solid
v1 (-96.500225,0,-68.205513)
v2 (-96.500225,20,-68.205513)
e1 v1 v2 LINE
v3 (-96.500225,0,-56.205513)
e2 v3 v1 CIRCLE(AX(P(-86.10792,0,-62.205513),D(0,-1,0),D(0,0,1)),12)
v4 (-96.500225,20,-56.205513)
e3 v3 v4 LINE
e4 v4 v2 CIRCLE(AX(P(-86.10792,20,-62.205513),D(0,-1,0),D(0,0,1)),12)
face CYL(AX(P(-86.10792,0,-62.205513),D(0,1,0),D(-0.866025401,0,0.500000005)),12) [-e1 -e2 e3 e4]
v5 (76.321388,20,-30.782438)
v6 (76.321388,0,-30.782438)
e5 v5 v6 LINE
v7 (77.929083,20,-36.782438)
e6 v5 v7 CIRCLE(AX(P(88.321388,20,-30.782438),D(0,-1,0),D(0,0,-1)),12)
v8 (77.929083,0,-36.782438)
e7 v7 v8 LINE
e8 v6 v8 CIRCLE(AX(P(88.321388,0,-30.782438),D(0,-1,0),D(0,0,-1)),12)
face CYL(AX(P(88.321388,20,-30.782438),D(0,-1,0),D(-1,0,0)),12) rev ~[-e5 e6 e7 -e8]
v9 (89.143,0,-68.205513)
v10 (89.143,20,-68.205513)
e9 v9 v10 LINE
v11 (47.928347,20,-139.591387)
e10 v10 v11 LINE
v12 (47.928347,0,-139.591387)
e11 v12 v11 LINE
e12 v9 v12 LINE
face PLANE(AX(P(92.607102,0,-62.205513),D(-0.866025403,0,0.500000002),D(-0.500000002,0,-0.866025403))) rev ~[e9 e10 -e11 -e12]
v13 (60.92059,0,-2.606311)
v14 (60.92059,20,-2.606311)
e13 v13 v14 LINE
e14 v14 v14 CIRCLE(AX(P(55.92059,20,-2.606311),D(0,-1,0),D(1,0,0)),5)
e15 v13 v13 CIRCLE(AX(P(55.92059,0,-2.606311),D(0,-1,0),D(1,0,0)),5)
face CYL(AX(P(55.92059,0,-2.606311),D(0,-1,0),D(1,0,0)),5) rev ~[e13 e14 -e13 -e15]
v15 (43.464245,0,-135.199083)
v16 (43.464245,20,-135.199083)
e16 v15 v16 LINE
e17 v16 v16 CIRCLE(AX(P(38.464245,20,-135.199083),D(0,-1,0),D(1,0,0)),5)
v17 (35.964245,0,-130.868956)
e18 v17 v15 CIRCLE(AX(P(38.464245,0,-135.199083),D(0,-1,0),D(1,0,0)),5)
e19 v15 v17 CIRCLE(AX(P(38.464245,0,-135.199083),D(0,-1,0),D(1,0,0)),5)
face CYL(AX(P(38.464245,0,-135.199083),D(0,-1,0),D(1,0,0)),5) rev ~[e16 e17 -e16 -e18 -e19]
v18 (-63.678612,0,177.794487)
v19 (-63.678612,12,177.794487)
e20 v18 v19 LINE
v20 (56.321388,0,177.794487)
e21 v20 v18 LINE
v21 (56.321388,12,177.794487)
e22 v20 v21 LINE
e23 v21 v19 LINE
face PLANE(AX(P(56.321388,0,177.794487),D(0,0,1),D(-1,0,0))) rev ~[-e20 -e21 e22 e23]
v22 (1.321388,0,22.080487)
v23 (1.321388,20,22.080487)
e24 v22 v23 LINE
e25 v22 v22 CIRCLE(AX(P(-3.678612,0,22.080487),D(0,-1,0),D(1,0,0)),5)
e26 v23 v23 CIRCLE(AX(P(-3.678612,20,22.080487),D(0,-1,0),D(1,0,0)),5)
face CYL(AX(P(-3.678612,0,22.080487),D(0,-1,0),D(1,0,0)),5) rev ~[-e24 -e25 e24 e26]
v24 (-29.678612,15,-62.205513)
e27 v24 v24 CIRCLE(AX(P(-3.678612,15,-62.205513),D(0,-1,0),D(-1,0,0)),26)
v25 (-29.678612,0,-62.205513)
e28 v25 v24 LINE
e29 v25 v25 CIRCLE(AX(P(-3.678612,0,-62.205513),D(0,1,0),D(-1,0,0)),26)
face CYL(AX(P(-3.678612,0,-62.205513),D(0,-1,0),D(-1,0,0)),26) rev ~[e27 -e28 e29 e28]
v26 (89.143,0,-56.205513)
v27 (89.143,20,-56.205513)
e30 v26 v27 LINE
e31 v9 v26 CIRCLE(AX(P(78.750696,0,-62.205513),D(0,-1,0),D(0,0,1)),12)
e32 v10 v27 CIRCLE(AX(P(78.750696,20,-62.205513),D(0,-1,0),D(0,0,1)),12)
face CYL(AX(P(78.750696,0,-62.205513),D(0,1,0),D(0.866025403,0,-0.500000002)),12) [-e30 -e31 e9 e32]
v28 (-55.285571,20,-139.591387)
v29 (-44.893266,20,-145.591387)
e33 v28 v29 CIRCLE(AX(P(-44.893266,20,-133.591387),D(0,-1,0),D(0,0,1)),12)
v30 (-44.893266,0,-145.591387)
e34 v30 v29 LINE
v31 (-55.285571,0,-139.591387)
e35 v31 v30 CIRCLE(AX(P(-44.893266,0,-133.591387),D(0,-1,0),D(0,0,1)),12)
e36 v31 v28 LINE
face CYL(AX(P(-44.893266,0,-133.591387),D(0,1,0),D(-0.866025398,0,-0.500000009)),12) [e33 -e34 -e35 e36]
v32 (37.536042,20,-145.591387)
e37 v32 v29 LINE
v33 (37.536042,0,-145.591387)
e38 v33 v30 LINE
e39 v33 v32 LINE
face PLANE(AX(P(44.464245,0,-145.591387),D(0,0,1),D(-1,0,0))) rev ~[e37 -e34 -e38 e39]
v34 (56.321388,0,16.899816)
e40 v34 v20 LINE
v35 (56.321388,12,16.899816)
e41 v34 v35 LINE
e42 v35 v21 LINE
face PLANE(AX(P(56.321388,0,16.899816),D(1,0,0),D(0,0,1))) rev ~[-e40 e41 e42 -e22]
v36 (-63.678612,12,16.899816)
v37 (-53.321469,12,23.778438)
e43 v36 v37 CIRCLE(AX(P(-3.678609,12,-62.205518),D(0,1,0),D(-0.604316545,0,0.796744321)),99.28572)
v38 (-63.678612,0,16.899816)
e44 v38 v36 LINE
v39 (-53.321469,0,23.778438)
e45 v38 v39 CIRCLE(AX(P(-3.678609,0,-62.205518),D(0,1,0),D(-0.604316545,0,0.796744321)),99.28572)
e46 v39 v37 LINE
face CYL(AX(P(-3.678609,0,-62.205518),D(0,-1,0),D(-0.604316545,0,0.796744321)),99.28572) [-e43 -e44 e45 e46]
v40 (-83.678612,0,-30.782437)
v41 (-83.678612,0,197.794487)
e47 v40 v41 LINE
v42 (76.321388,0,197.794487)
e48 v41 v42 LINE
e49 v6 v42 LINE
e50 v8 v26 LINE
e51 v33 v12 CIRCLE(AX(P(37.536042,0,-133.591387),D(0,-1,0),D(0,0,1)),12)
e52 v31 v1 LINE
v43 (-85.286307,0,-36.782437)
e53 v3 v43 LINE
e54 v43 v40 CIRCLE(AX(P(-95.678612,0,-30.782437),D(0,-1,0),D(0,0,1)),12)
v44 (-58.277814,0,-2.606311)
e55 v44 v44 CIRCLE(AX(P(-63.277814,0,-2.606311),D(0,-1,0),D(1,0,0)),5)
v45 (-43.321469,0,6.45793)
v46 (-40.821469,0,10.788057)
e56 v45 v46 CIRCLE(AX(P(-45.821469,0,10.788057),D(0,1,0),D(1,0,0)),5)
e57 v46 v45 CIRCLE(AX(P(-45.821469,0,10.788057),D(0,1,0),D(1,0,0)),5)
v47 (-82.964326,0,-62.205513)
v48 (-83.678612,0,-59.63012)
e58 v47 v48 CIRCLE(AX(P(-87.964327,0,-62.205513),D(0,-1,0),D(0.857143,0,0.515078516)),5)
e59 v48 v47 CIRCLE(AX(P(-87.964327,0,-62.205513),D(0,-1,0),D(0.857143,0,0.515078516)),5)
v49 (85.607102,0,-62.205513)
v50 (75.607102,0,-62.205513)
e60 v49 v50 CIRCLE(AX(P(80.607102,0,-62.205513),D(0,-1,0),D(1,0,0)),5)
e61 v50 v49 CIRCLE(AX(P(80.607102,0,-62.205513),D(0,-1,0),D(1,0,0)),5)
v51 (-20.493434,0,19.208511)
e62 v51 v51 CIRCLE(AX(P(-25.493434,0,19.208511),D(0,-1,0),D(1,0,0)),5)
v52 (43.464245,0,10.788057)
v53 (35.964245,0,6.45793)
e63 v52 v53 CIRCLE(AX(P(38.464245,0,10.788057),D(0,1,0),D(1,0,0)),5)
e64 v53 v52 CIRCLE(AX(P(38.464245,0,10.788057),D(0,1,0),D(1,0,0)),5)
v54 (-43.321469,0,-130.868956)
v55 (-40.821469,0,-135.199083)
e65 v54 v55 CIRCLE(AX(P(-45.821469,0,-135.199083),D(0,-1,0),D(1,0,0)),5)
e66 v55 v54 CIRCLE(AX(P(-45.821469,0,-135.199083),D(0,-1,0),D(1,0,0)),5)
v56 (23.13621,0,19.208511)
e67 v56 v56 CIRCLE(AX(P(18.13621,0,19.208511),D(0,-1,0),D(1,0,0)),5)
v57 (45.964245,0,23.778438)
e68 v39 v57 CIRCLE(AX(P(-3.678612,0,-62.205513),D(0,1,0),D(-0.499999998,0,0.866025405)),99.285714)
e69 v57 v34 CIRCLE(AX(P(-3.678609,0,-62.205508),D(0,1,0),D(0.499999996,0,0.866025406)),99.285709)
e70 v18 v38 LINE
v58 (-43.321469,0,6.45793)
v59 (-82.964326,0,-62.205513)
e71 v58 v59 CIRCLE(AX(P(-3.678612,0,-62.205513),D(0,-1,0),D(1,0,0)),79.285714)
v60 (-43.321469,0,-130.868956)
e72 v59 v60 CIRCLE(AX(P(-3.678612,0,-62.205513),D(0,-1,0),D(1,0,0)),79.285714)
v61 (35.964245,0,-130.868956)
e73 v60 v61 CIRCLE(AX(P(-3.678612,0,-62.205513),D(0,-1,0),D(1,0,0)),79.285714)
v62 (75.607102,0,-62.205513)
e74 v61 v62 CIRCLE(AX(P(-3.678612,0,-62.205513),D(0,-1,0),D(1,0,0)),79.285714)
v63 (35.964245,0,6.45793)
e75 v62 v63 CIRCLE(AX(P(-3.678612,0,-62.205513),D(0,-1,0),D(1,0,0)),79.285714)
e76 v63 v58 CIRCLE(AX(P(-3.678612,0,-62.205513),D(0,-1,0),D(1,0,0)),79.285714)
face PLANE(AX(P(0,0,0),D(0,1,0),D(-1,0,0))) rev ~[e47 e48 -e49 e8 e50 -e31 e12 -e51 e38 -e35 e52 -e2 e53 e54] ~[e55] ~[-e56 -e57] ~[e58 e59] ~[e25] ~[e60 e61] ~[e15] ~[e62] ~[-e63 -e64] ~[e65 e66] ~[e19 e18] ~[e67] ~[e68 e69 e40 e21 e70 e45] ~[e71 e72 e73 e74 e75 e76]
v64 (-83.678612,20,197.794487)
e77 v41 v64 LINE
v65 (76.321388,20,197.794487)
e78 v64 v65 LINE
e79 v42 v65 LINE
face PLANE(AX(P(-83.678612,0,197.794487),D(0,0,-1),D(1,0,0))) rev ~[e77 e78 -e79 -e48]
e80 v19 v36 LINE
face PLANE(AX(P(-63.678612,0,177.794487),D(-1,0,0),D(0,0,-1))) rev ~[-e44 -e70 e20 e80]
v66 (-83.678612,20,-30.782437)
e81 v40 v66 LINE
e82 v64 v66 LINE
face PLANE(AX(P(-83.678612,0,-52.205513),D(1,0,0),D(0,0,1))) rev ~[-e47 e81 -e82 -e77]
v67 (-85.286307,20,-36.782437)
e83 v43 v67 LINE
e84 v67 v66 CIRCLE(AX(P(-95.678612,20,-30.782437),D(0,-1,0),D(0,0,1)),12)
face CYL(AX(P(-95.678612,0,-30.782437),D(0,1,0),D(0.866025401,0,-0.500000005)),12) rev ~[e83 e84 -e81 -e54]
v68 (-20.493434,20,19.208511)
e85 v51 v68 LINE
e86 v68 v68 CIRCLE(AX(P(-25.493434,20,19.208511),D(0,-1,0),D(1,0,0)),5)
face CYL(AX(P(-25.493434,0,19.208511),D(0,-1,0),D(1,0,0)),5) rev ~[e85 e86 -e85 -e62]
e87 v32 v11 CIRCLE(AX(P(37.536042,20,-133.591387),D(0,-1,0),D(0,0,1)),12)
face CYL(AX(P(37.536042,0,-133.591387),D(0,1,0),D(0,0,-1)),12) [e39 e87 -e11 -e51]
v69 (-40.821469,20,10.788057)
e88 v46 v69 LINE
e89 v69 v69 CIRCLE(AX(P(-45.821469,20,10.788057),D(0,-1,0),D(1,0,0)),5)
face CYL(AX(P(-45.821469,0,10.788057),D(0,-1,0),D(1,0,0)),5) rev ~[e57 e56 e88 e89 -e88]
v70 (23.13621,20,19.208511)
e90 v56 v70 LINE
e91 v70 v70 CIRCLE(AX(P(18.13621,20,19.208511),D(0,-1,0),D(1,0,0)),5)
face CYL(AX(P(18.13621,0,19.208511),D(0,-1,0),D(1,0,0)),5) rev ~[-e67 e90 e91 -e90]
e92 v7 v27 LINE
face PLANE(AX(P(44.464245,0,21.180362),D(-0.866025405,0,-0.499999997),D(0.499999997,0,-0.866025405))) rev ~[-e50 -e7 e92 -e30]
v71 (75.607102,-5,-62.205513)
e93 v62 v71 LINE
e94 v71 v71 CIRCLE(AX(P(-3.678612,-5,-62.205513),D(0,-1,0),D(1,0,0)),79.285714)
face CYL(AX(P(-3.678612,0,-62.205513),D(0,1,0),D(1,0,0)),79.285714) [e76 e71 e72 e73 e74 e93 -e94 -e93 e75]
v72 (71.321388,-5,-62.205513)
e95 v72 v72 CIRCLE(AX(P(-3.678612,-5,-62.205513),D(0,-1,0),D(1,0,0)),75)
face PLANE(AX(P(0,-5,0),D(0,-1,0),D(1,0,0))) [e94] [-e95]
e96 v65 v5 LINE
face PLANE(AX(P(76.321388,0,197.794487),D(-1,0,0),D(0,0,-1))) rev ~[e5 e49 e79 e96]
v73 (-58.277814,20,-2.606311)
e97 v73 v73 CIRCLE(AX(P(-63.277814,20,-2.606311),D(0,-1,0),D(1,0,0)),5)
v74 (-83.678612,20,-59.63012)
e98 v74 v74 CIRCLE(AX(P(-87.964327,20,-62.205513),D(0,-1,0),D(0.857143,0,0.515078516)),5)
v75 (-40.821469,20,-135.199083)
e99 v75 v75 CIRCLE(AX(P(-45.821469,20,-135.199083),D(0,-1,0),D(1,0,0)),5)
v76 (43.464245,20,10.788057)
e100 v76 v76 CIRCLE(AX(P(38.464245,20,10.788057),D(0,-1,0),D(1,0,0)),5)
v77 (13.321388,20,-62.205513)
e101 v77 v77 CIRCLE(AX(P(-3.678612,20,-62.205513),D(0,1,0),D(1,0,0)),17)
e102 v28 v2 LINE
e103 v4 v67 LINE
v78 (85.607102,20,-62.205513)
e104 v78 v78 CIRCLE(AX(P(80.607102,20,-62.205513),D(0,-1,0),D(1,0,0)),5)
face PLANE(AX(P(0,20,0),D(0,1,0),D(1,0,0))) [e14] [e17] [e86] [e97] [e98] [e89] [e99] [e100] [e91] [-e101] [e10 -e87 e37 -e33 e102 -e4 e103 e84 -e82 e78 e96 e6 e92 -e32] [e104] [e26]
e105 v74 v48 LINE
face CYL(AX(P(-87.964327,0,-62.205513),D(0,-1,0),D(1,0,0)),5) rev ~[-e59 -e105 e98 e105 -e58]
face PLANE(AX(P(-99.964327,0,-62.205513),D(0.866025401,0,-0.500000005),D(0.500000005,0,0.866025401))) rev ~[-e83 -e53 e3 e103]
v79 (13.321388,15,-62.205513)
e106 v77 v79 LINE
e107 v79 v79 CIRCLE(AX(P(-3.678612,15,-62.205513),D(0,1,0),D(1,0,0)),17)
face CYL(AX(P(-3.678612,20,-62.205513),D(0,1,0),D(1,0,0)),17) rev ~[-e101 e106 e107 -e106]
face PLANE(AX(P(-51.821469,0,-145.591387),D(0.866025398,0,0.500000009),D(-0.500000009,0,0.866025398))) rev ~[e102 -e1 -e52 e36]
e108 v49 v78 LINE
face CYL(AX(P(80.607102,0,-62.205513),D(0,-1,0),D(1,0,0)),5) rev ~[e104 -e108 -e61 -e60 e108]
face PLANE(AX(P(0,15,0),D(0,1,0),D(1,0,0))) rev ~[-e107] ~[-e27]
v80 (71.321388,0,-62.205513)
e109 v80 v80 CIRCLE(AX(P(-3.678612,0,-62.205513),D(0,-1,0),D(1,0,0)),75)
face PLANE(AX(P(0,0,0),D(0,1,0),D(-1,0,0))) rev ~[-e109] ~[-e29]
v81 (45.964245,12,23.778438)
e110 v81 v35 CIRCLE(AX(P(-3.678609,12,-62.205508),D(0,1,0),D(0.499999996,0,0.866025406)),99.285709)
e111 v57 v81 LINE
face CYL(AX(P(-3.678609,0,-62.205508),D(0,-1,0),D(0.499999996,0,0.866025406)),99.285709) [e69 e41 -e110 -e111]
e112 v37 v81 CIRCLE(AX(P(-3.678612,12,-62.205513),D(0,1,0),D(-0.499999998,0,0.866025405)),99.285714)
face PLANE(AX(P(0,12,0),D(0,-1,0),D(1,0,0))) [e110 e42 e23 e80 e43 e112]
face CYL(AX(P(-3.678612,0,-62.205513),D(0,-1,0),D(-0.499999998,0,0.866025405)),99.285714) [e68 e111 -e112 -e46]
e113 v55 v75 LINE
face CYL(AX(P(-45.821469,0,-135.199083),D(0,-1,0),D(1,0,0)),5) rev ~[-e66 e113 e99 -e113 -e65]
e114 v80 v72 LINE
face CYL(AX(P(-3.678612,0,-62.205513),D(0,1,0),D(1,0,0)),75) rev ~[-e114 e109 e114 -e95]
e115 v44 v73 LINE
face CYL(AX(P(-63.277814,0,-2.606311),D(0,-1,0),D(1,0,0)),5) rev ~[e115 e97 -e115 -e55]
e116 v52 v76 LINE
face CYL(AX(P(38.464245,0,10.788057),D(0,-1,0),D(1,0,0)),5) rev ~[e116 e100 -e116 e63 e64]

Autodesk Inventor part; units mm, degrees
ref_plane "YZ Plane" through (0, 0, 0) normal (1, 0, 0) x (0, 1, 0)
ref_plane "XZ Plane" through (0, 0, 0) normal (0, 1, 0) x (-1, 0, 0)
ref_plane "XY Plane" through (0, 0, 0) normal (0, 0, 1) x (1, 0, 0)
sketch "Sketch1" plane through (0, 0, 0) normal (0, 1, 0) x (-1, 0, 0)
  line L0 (83.678612, 197.794487) -> (-76.321388, 197.794487)
  line L1 (-76.321388, 197.794487) -> (-76.321388, -52.205513)
  line L2 (-76.321388, -52.205513) -> (83.678612, -52.205513)
  line L3 (83.678612, -52.205513) -> (83.678612, 197.794487)
  circle A0 centre (3.678612, -62.205513) radius 80
  line L4 (83.678612, -52.205513) -> (83.678612, -62.205513)
  line L5 (-76.321388, -52.205513) -> (-76.321388, -62.205513)
  circle A1 centre (3.678612, -62.205513) radius 26
  circle A2 centre (3.678612, -62.205513) radius 40
  point P0 (0, 0)
  point P1 (59.392898, -23.634084)
  point P2 (-75.693927, -52.205513)
  point P3 (83.051152, -52.205513)
  dimension "d0" = 250
  dimension "d1" = 160
  dimension "d2" = 160
  dimension "d3" = 10
  dimension "d4" = 52
  dimension "d5" = 80
extrude "Extrusion1" add sketch "Sketch1" along normal blind 20 contours L3 L2 A0 L1 L0 | L4 A0 L2 | L2 A0 L5 | A0 L2 A2 | L2 A2 A0 | A2 L2 A1 | L2 A1 A2
sketch "Sketch2" plane through (0, 20, 0) normal (0, 1, 0) x (1, 0, 0)
  circle A0 centre (-3.678612, 62.205513) radius 26
  circle A1 centre (-3.678612, 62.205513) radius 26
  circle A2 centre (-3.678612, 62.205513) radius 17
  point P0 (0, 0)
  dimension "d8" = 34
extrude "Extrusion2" add sketch "Sketch2" against normal blind 5
sketch "Sketch3" plane through (0, 0, 0) normal (0, -1, 0) x (1, 0, 0)
  circle A0 centre (-3.678612, -62.205513) radius 75
  circle A1 centre (-3.678612, -62.205513) radius 75
  line L0 (92.607102, -62.205513) -> (44.464245, -145.591387)
  line L1 (44.464245, -145.591387) -> (-51.821469, -145.591387)
  line L2 (-51.821469, -145.591387) -> (-99.964327, -62.205513)
  line L3 (-99.964327, -62.205513) -> (-51.821469, 21.180362)
  line L4 (-51.821469, 21.180362) -> (44.464245, 21.180362)
  line L5 (44.464245, 21.180362) -> (92.607102, -62.205513)
  line L6 (80.607102, -62.205513) -> (38.464245, -135.199083)
  line L7 (38.464245, -135.199083) -> (-45.821469, -135.199083)
  line L8 (-45.821469, -135.199083) -> (-87.964327, -62.205513)
  line L9 (-87.964327, -62.205513) -> (-45.821469, 10.788057)
  line L10 (-45.821469, 10.788057) -> (38.464245, 10.788057)
  line L11 (38.464245, 10.788057) -> (80.607102, -62.205513)
  circle A2 centre (80.607102, -62.205513) radius 5
  circle A3 centre (38.464245, 10.788057) radius 5
  circle A4 centre (-45.821469, 10.788057) radius 5
  circle A5 centre (-87.964327, -62.205513) radius 5
  circle A6 centre (-45.821469, -135.199083) radius 5
  circle A7 centre (38.464245, -135.199083) radius 5
  circle A8 centre (-3.678612, -62.205513) radius 26
  circle A9 centre (-3.678612, -62.205513) radius 0.853538
  point P0 (0, 0)
  point P1 (-59.392898, -100.776941)
  point P2 (-3.678612, -62.205513)
  dimension "d13" = 360
sketch "Sketch4" plane through (0, 0, 0) normal (0, -1, 0) x (1, 0, 0)
  circle A0 centre (-45.821469, -135.199083) radius 5
  line L0 (-45.821469, -135.199083) -> (-87.964327, -62.205513)
  line L1 (-51.821469, -145.591387) -> (-99.964327, -62.205513)
  circle A1 centre (-87.964327, -62.205513) radius 5
  circle A2 centre (-45.821469, 10.788057) radius 5
  line L2 (-87.964327, -62.205513) -> (-45.821469, 10.788057)
  line L3 (-99.964327, -62.205513) -> (-51.821469, 21.180362)
  line L4 (38.464245, -135.199083) -> (-45.821469, -135.199083)
  circle A3 centre (38.464245, -135.199083) radius 5
  line L5 (44.464245, -145.591387) -> (-51.821469, -145.591387)
  line L6 (80.607102, -62.205513) -> (38.464245, -135.199083)
  line L7 (92.607102, -62.205513) -> (44.464245, -145.591387)
  circle A4 centre (-3.678612, -62.205513) radius 75
  circle A5 centre (-3.678612, -62.205513) radius 75
  line L8 (-45.821469, 10.788057) -> (38.464245, 10.788057)
  line L9 (-51.821469, 21.180362) -> (44.464245, 21.180362)
  circle A6 centre (80.607102, -62.205513) radius 5
  circle A7 centre (38.464245, 10.788057) radius 5
  line L10 (38.464245, 10.788057) -> (80.607102, -62.205513)
  line L11 (44.464245, 21.180362) -> (92.607102, -62.205513)
  circle A8 centre (-3.678612, -62.205513) radius 26
  circle A9 centre (-3.678612, -62.205513) radius 17
  circle A10 centre (-3.678612, -62.205513) radius 2.321388
  point P0 (0, 0)
  point P1 (0, 0)
  point P2 (-59.392898, -100.776941)
  dimension "d18" = 360
extrude "Extrusion3" cut sketch "Sketch3" against normal blind 22 contours A2 L6 L11 | L11 L6 A2 | A3 L10 L11 | L11 L10 A3 | A7 L7 L6 | L6 L7 A7 | A4 L9 L10 | L10 L9 A4 | A6 L8 L7 | L7 L8 A6 | A5 L8 L9 | L9 L8 A5
extrude "Extrusion4" add sketch "Sketch4" against normal blind 20 contours A0 L0 A4 L4 | A4 L6 A3 L4 | L0 A1 L2 A4 | A4 L10 A6 L6 | L2 A2 L8 A4 | L8 A7 L10 A4 | L1 L3 L9 L11 L7 L5
sketch "Sketch5" plane through (0, 0, 0) normal (0, -1, 0) x (1, 0, 0)
  circle A0 centre (-3.678612, -62.205513) radius 17
  circle A1 centre (-3.678612, -62.205513) radius 79.285714
  circle A2 centre (80.607102, -62.205513) radius 5
  circle A3 centre (-3.678612, -62.205513) radius 75
  point P0 (0, 0)
  dimension "d21" = 150
extrude "Extrusion5" add sketch "Sketch5" along normal blind 5 contours A1
fillet "Fillet1" radius 12 6 edges at (-83.6786, 10, -33.9978) (-99.9643, 10, -62.2055) (-51.8215, 10, -145.5914) (44.4642, 10, -145.5914) (92.6071, 10, -62.2055) (76.3214, 10, -33.9978)
sketch "Sketch6" plane through (0, 0, 0) normal (0, -1, 0) x (1, 0, 0)
  arc A0 (89.143, -68.205513) -> (89.143, -56.205513) centre (78.750696, -62.205513) ccw
  line L0 (89.143, -56.205513) -> (77.929083, -36.782438)
  arc A1 (76.321388, -30.782438) -> (77.929083, -36.782438) centre (88.321388, -30.782438) ccw
  line L1 (76.321388, 197.794487) -> (76.321388, -30.782438)
  line L2 (-83.678612, 197.794487) -> (76.321388, 197.794487)
  line L3 (-83.678612, -30.782438) -> (-83.678612, 197.794487)
  arc A2 (-85.286307, -36.782438) -> (-83.678612, -30.782438) centre (-95.678612, -30.782438) ccw
  line L4 (-85.286307, -36.782438) -> (-96.500225, -56.205513)
  arc A3 (-96.500225, -56.205513) -> (-96.500225, -68.205513) centre (-86.10792, -62.205513) ccw
  line L5 (-96.500225, -68.205513) -> (-55.285571, -139.591387)
  arc A4 (-55.285571, -139.591387) -> (-44.893266, -145.591387) centre (-44.893266, -133.591387) ccw
  line L6 (-44.893266, -145.591387) -> (37.536042, -145.591387)
  arc A5 (37.536042, -145.591387) -> (47.928346, -139.591387) centre (37.536042, -133.591387) ccw
  line L7 (47.928346, -139.591387) -> (89.143, -68.205513)
  circle A6 centre (-87.964327, -62.205513) radius 5
  arc A7 (-43.321469, 6.45793) -> (-82.964327, -62.205513) centre (-3.678612, -62.205513) ccw
  circle A8 centre (-45.821469, 10.788057) radius 5
  arc A9 (35.964245, 6.45793) -> (-43.321469, 6.45793) centre (-3.678612, -62.205513) ccw
  circle A10 centre (38.464245, 10.788057) radius 5
  arc A11 (75.607102, -62.205513) -> (35.964245, 6.45793) centre (-3.678612, -62.205513) ccw
  circle A12 centre (80.607102, -62.205513) radius 5
  arc A13 (35.964245, -130.868956) -> (75.607102, -62.205513) centre (-3.678612, -62.205513) ccw
  circle A14 centre (38.464245, -135.199083) radius 5
  arc A15 (-43.321469, -130.868956) -> (35.964245, -130.868956) centre (-3.678612, -62.205513) ccw
  circle A16 centre (-45.821469, -135.199083) radius 5
  arc A17 (-82.964327, -62.205513) -> (-43.321469, -130.868956) centre (-3.678612, -62.205513) ccw
  arc A18 (56.321388, -30.782438) -> (60.608575, -46.782438) centre (88.321388, -30.782438) ccw
  line L8 (60.608575, -46.782438) -> (69.513091, -62.205513)
  line L9 (69.513091, -62.205513) -> (32.917239, -125.591387)
  line L10 (32.917239, -125.591387) -> (-40.274464, -125.591387)
  line L11 (-40.274464, -125.591387) -> (-76.870316, -62.205513)
  line L12 (-76.870316, -62.205513) -> (-67.965799, -46.782438)
  arc A19 (-67.965799, -46.782438) -> (-63.678612, -30.782438) centre (-95.678612, -30.782438) ccw
  line L13 (-63.678612, -30.782438) -> (-63.678612, 177.794487)
  line L14 (-63.678612, 177.794487) -> (56.321388, 177.794487)
  line L15 (56.321388, 177.794487) -> (56.321388, -30.782438)
  arc A20 (-53.321469, 23.778438) -> (-102.964327, -62.205513) centre (-3.678612, -62.205513) ccw
  arc A21 (-102.964327, -62.205513) -> (-53.321469, -148.189464) centre (-3.678612, -62.205513) ccw
  arc A22 (-53.321469, -148.189464) -> (45.964245, -148.189464) centre (-3.678612, -62.205513) ccw
  arc A23 (45.964245, -148.189464) -> (95.607102, -62.205513) centre (-3.678612, -62.205513) ccw
  arc A24 (95.607102, -62.205513) -> (45.964245, 23.778438) centre (-3.678612, -62.205513) ccw
  arc A25 (45.964245, 23.778438) -> (-53.321469, 23.778438) centre (-3.678612, -62.205513) ccw
  point P0 (0, 0)
  point P1 (-63.678612, 16.899816)
  point P2 (56.321388, 16.899816)
  dimension "d25" = 20
  dimension "d26" = 20
sketch "Sketch6 outline for Extrusion6" plane through (0, 0, 0) normal (0, -1, 0) x (1, 0, 0)
  line L0 (56.321388, 177.794487) -> (-63.678612, 177.794487)
  line L1 (56.321388, 16.899816) -> (56.321388, 177.794487)
  arc A0 (45.964245, 23.778438) -> (56.321388, 16.899816) centre (-3.678612, -62.205513) cw
  arc A1 (-53.321469, 23.778438) -> (45.964245, 23.778438) centre (-3.678612, -62.205513) cw
  arc A2 (-63.678612, 16.899816) -> (-53.321469, 23.778438) centre (-3.678612, -62.205513) cw
  line L2 (-63.678612, 177.794487) -> (-63.678612, 16.899816)
extrude "Extrusion6" cut sketch "Sketch6 outline for Extrusion6" against normal blind 12
sketch "Sketch7" plane through (0, 0, 0) normal (0, -1, 0) x (1, 0, 0)
  circle A0 centre (-3.678612, 22.080487) radius 5
  circle A1 centre (-3.678612, -62.205513) radius 17
  circle A2 centre (-25.493434, 19.208511) radius 5
  circle A3 centre (-45.821612, 10.788304) radius 5
  circle A4 centre (-63.277814, -2.606311) radius 5
  circle A5 centre (-76.672429, -20.062513) radius 5
  circle A6 centre (-85.092637, -40.390691) radius 5
  circle A7 centre (-87.964612, -62.205513) radius 5
  circle A8 centre (-85.092637, -84.020335) radius 5
  circle A9 centre (-76.672429, -104.348513) radius 5
  circle A10 centre (-63.277814, -121.804715) radius 5
  circle A11 centre (-45.821612, -135.19933) radius 5
  circle A12 centre (-25.493434, -143.619537) radius 5
  circle A13 centre (-3.678612, -146.491513) radius 5
  circle A14 centre (18.13621, -143.619537) radius 5
  circle A15 centre (38.464388, -135.19933) radius 5
  circle A16 centre (55.92059, -121.804715) radius 5
  circle A17 centre (69.315205, -104.348513) radius 5
  circle A18 centre (77.735412, -84.020335) radius 5
  circle A19 centre (80.607388, -62.205513) radius 5
  circle A20 centre (77.735412, -40.390691) radius 5
  circle A21 centre (69.315205, -20.062513) radius 5
  circle A22 centre (55.92059, -2.606311) radius 5
  circle A23 centre (38.464388, 10.788304) radius 5
  circle A24 centre (18.13621, 19.208511) radius 5
  point P0 (0, 0)
  dimension "d29" = 84.286
  dimension "d30" = 10
  dimension "d33" = 360
extrude "Extrusion7" cut sketch "Sketch7" against normal blind 39 contours A0 | A2 | A4 | A5 | A21 | A22 | A24
sketch "Sketch8" plane through (0, 20, 0) normal (0, 1, 0) x (1, 0, 0)
  circle A0 centre (69.315205, 20.062513) radius 5
  circle A1 centre (-76.672429, 20.062513) radius 5
  point P0 (0, 0)
extrude "Extrusion8" add sketch "Sketch8" against normal blind 20
properties part number "ZadKriska"
